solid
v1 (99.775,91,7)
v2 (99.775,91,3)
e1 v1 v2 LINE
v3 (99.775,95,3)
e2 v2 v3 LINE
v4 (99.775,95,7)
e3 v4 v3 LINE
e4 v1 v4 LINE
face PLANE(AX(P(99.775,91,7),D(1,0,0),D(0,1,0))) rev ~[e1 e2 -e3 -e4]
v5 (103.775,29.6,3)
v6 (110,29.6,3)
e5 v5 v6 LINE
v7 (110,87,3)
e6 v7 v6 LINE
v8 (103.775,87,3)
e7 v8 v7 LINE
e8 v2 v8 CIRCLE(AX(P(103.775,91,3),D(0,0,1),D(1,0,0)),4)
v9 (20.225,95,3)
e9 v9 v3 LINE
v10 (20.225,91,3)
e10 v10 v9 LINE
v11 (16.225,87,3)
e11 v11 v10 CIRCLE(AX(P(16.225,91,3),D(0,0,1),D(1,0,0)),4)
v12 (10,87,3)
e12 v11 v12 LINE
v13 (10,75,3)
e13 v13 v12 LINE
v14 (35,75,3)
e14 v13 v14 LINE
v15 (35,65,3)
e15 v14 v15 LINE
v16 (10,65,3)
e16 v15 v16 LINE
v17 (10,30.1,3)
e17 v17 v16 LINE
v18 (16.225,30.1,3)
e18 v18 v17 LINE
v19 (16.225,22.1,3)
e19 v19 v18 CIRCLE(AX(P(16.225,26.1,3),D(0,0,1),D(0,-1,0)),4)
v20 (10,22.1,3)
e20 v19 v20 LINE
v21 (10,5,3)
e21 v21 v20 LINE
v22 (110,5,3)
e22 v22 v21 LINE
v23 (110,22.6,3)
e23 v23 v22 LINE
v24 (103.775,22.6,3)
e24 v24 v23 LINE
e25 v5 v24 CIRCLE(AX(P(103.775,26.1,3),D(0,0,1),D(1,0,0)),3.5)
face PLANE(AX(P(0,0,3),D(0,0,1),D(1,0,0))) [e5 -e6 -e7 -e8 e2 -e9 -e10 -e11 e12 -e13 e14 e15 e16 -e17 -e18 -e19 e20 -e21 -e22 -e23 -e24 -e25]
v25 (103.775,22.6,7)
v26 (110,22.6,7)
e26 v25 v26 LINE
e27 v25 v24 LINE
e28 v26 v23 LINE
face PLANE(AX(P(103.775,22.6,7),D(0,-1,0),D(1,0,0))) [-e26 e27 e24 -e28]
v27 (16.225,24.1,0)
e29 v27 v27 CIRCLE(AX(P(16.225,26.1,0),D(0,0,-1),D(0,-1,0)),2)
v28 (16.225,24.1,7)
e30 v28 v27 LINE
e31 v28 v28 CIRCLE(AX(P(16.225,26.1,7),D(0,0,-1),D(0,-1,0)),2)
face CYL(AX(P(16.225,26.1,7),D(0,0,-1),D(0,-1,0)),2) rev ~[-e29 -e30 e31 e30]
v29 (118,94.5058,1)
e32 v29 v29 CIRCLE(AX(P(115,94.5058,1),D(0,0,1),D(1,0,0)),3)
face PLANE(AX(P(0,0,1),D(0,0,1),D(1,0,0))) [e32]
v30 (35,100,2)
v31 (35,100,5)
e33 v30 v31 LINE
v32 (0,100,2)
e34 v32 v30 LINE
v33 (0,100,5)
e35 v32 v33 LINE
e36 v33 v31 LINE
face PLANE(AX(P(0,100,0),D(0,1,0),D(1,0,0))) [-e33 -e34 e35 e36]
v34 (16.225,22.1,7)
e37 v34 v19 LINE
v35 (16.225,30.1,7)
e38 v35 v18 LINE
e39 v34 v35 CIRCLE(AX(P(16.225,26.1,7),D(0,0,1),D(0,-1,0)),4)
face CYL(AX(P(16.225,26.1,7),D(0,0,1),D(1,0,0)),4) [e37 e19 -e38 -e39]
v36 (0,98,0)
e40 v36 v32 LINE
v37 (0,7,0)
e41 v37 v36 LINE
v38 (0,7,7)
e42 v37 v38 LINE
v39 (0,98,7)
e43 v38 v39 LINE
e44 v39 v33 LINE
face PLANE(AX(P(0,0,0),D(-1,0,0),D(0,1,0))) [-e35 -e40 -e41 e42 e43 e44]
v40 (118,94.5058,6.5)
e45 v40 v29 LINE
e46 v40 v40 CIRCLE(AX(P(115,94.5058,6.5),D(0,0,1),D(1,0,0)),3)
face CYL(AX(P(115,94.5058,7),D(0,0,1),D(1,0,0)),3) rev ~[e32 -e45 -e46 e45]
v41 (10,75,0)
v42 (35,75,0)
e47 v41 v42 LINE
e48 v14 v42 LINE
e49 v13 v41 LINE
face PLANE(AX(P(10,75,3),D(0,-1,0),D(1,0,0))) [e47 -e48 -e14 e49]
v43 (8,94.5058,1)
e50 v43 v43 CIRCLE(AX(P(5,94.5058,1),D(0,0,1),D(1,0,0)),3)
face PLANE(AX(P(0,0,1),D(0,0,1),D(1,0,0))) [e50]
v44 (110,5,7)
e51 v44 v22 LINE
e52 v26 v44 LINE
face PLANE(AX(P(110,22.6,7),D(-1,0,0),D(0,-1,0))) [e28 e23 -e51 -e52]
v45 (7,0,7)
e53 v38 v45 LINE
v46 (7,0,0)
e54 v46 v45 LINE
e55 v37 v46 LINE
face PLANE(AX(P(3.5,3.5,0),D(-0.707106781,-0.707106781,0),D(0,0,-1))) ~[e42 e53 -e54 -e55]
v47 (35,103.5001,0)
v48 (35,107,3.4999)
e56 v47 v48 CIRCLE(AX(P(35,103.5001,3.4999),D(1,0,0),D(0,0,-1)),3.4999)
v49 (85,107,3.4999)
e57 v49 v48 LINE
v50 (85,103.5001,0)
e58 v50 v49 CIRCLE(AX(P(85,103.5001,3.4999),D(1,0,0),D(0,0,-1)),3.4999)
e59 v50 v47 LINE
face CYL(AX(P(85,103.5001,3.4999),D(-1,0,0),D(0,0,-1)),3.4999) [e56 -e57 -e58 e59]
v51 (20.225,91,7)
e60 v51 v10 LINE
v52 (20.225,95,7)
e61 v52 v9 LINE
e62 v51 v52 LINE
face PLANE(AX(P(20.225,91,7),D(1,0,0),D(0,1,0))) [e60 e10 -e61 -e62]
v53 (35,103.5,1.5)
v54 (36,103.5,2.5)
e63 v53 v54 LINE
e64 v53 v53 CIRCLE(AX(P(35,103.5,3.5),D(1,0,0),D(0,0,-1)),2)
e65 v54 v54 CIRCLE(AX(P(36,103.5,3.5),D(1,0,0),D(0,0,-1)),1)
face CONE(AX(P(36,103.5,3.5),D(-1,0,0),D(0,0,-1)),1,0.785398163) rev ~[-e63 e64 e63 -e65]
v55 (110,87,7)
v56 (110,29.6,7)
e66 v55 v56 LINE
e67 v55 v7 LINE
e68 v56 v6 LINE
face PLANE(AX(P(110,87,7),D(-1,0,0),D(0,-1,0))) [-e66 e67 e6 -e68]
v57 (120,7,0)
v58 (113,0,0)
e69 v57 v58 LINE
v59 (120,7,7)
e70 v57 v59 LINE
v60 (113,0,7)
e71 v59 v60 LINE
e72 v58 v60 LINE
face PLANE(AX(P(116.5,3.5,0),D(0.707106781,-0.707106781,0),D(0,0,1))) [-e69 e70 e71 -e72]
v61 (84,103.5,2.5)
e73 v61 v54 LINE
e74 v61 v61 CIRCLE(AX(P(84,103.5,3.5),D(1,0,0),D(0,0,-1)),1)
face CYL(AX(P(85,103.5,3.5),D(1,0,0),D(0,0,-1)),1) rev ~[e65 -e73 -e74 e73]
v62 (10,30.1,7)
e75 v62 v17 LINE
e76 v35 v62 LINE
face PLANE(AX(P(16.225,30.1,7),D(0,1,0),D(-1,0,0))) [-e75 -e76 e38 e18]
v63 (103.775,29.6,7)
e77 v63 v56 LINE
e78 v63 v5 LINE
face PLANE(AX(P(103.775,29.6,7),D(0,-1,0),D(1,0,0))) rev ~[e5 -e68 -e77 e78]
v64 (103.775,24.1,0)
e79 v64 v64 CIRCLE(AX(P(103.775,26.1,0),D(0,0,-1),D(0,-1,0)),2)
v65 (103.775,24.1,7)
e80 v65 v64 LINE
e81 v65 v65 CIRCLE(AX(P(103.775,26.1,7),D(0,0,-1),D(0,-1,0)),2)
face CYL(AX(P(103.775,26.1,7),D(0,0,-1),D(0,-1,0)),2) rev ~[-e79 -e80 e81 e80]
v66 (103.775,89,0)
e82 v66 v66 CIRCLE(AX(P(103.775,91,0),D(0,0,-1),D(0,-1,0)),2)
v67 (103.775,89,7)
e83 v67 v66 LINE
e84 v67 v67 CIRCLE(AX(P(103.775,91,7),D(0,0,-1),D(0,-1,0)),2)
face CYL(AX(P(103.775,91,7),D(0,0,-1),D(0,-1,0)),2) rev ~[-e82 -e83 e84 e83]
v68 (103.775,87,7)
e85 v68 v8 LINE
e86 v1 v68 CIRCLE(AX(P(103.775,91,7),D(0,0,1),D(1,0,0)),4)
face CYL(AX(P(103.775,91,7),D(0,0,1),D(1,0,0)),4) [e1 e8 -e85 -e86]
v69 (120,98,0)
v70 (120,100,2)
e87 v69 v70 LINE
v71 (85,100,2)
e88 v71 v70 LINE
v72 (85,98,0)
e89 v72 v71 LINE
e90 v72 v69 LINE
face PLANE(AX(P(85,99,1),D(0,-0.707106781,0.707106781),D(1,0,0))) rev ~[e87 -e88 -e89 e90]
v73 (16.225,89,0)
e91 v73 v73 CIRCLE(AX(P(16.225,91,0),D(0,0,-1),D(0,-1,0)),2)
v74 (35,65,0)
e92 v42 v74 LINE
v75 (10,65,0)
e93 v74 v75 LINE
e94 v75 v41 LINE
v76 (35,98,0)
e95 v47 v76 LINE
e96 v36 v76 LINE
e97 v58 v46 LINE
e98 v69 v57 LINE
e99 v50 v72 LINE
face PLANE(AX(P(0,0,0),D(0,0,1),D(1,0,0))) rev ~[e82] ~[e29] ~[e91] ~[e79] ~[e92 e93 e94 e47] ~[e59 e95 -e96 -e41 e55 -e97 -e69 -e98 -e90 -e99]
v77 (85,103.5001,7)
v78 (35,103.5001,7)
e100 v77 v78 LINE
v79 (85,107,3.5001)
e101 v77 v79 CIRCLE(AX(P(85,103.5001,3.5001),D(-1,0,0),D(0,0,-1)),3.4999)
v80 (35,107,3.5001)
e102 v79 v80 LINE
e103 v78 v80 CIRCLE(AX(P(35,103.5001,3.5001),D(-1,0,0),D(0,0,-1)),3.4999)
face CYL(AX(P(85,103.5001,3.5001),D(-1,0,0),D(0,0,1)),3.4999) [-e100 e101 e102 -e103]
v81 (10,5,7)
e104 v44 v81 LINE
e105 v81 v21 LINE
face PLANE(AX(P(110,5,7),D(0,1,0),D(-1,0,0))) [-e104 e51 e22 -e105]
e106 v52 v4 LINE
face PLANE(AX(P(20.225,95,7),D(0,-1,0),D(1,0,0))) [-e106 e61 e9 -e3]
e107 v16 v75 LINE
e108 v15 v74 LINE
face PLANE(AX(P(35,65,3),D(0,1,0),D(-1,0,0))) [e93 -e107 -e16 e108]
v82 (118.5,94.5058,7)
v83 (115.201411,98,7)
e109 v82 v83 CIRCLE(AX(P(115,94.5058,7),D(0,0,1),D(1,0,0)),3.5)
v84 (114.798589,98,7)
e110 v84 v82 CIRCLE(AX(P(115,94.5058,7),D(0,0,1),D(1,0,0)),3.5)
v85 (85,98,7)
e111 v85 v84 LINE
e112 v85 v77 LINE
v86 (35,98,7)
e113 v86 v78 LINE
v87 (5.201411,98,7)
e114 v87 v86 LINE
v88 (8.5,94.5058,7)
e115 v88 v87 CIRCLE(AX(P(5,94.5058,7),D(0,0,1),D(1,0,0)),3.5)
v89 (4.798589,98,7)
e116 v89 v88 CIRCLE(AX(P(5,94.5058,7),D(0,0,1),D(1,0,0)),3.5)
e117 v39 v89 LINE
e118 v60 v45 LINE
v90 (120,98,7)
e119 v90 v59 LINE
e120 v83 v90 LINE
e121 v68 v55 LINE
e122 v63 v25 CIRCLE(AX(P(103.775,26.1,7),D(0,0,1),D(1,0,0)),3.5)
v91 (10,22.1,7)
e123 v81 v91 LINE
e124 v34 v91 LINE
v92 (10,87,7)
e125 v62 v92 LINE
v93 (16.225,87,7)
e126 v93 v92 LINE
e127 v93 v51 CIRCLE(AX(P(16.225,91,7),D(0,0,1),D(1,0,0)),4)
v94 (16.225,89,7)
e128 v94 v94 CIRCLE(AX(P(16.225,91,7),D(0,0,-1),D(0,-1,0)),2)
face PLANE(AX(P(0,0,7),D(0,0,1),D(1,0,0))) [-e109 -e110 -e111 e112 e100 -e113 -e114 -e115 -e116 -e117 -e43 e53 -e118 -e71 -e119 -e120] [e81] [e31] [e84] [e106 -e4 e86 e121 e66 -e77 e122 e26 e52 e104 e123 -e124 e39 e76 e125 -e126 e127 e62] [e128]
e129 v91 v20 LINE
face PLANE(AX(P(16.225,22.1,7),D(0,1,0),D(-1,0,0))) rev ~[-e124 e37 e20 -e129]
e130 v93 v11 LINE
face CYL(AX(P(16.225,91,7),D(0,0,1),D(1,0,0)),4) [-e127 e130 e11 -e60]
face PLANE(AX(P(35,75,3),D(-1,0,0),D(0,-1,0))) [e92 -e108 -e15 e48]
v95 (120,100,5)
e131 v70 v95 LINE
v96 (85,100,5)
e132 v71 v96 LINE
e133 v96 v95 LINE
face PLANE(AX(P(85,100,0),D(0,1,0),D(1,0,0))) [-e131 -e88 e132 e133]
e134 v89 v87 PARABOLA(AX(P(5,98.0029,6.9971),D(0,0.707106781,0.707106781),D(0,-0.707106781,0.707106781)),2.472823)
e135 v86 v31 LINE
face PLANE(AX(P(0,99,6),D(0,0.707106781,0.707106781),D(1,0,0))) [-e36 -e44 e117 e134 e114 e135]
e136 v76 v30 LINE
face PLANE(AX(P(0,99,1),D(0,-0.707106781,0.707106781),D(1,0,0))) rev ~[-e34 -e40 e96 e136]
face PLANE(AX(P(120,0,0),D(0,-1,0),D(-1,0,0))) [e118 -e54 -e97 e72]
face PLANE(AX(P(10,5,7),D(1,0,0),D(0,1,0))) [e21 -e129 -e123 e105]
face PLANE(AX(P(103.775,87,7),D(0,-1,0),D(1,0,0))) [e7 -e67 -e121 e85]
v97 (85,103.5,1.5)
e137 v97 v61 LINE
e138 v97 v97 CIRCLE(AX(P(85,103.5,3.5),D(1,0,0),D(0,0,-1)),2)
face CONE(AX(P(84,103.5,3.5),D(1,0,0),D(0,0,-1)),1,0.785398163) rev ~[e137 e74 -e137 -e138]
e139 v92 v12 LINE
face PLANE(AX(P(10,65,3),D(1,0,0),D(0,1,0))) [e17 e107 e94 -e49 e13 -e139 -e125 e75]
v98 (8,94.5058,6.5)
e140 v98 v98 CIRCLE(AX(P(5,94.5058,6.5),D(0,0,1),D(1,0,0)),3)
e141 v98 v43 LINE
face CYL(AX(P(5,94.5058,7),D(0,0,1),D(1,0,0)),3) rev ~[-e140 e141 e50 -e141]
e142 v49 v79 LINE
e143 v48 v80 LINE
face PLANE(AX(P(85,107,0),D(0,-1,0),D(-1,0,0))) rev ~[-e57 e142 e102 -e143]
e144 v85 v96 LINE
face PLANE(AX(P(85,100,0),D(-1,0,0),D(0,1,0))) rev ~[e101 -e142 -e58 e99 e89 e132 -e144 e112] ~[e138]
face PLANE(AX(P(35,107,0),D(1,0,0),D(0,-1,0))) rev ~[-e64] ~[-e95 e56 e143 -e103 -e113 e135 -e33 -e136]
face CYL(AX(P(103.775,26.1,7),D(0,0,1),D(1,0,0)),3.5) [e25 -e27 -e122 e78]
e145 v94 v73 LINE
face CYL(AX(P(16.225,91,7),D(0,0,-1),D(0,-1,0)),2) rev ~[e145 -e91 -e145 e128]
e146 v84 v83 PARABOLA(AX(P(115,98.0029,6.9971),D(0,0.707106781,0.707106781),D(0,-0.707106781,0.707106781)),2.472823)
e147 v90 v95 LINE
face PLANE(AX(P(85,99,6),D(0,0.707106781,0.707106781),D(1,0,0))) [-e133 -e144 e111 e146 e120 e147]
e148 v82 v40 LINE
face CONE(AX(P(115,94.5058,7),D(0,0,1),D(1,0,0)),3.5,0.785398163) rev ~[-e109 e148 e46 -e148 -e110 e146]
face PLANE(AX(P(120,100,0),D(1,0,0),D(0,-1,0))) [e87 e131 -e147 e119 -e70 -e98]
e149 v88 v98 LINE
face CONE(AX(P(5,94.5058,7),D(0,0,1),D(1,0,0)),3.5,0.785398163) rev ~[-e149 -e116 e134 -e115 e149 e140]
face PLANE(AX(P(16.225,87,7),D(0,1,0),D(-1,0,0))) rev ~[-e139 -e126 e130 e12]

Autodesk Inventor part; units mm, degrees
ref_plane "YZ Plane" through (0, 0, 0) normal (1, 0, 0) x (0, 1, 0)
ref_plane "XZ Plane" through (0, 0, 0) normal (0, 1, 0) x (-1, 0, 0)
ref_plane "XY Plane" through (0, 0, 0) normal (0, 0, 1) x (1, 0, 0)
sketch "Sketch1" plane through (0, 0, 0) normal (0, 0, 1) x (1, 0, 0)
  line L0 (0, 100) -> (120, 100)
  line L1 (120, 100) -> (120, 0)
  line L2 (120, 0) -> (0, 0)
  line L3 (0, 0) -> (0, 100)
  line L4 (35, 100) -> (85, 100)
  line L5 (85, 100) -> (85, 107)
  line L6 (85, 107) -> (35, 107)
  line L7 (35, 107) -> (35, 100)
  point P0 (60, 100)
  dimension "d0" = 120
  dimension "d1" = 50
  dimension "d2" = 7
  dimension "d3" = 100
extrude "Extrusion1" add sketch "Sketch1" along normal blind 7
fillet "Fillet1" radius 3.5 2 edges at (60, 107, 7) (60, 107, 0)
sketch "Sketch2" plane through (85, 100, 7) normal (1, 0, 0) x (0, 0, -1)
  arc A0 (7, 3.5) -> (0, 3.5) centre (3.5, 3.5) ccw projected
  line L0 (0, 0) -> (0, 3.5) projected
  line L1 (7, 0) -> (0, 0) projected
  line L2 (7, 0) -> (7, 3.5) projected
  circle A1 centre (3.5, 3.5) radius 1
  point P0 (7, -100)
  dimension "d7" = 2
extrude "Extrusion2" cut sketch "Sketch2" against normal through all contours A1
ref_plane "Work Plane1" through (60, 0, 0) normal (1, 0, 0) x (0, 0, -1)
ref_plane "Work Plane2" through (0, 50, 0) normal (0, 1, 0) x (1, 0, 0)
chamfer "Chamfer1" distance 2 angle 45 4 edges at (17.5, 100, 7) (17.5, 100, 0) (102.5, 100, 0) (102.5, 100, 7)
sketch "Sketch3" plane through (0, 0, 7) normal (0, 0, 1) x (1, 0, 0)
  circle A0 centre (115, 94.5058) radius 3 projected
  circle A1 centre (5, 94.5058) radius 3 projected
  point P0 (0, 0)
extrude "Extrusion3" cut sketch "Sketch3" against normal blind 6
chamfer "Chamfer2" distance 0.5 angle 45 2 edges at (112, 94.5058, 7) (2, 94.5058, 7)
sketch "Sketch4" plane through (0, 0, 7) normal (0, 0, 1) x (1, 0, 0)
  line L0 (10, 95) -> (110, 95)
  line L1 (110, 95) -> (110, 5)
  line L2 (110, 5) -> (10, 5)
  line L3 (10, 5) -> (10, 95)
  line L4 (35, 100) -> (0, 100) projected
  line L5 (0, 98) -> (0, 0) projected
  line L6 (120, 0) -> (120, 98) projected
  line L7 (0, 0) -> (120, 0) projected
  line L8 (16.225, 91) -> (103.775, 91) construction
  line L9 (103.775, 91) -> (103.775, 26.1) construction
  line L10 (103.775, 26.1) -> (16.225, 26.1) construction
  line L11 (16.225, 26.1) -> (16.225, 91) construction
  circle A0 centre (16.225, 91) radius 4
  line L12 (20.225, 91) -> (20.225, 95)
  line L13 (16.225, 87) -> (10, 87)
  circle A1 centre (16.225, 26.1) radius 4
  line L14 (16.225, 30.1) -> (10, 30.1)
  line L15 (16.225, 22.1) -> (10, 22.1)
  circle A2 centre (103.775, 91) radius 4
  circle A3 centre (103.775, 26.1) radius 3.5
  line L16 (103.775, 29.6) -> (110, 29.6)
  line L17 (103.775, 22.6) -> (110, 22.6)
  line L18 (99.775, 91) -> (99.775, 95)
  line L19 (103.775, 87) -> (110, 87)
  point P0 (60, 91)
  point P1 (60, 95)
  dimension "d18" = 5
  dimension "d19" = 10
  dimension "d20" = 10
  dimension "d21" = 5
  dimension "d24" = 87.55
  dimension "d25" = 64.9
  dimension "d26" = 4
  dimension "d27" = 8
  dimension "d28" = 8
  dimension "d29" = 8
  dimension "d30" = 7
extrude "Extrusion4" cut sketch "Sketch4" against normal blind 4 contours L0 L18 A2 L19 L1 L16 A3 L17 L2 L3 L15 A1 L14 L13 A0 L12
sketch "Sketch5" plane through (0, 0, 7) normal (0, 0, 1) x (1, 0, 0)
  line L0 (103.775, 22.6) -> (110, 22.6) projected
  line L1 (110, 22.6) -> (110, 5) projected
  line L2 (110, 5) -> (10, 5) projected
  line L3 (10, 5) -> (10, 22.1) projected
  line L4 (10, 22.1) -> (16.225, 22.1) projected
  arc A0 (16.225, 22.1) -> (16.225, 30.1) centre (16.225, 26.1) ccw projected
  line L5 (16.225, 30.1) -> (10, 30.1) projected
  line L6 (10, 30.1) -> (10, 87) projected
  line L7 (10, 87) -> (16.225, 87) projected
  arc A1 (16.225, 87) -> (20.225, 91) centre (16.225, 91) ccw projected
  line L8 (20.225, 91) -> (20.225, 95) projected
  line L9 (20.225, 95) -> (99.775, 95) projected
  line L10 (99.775, 95) -> (99.775, 91) projected
  arc A2 (99.775, 91) -> (103.775, 87) centre (103.775, 91) ccw projected
  line L11 (103.775, 87) -> (110, 87) projected
  line L12 (110, 87) -> (110, 29.6) projected
  line L13 (110, 29.6) -> (103.775, 29.6) projected
  arc A3 (103.775, 29.6) -> (103.775, 22.6) centre (103.775, 26.1) ccw projected
  arc A4 (4.798, 98) -> (5.202, 98) centre (5, 94.5058) ccw projected
  line L14 (0, 98) -> (4.798, 98) projected
  line L15 (0, 98) -> (0, 0) projected
  line L16 (0, 0) -> (120, 0) projected
  line L17 (120, 0) -> (120, 98) projected
  line L18 (115.202, 98) -> (120, 98) projected
  arc A5 (114.798, 98) -> (115.202, 98) centre (115, 94.5058) ccw projected
  line L19 (85, 98) -> (114.798, 98) projected
  line L20 (85, 98) -> (85, 103.5) projected
  line L21 (35, 103.5) -> (85, 103.5) projected
  line L22 (35, 103.5) -> (35, 98) projected
  line L23 (5.202, 98) -> (35, 98) projected
hole "Hole1" at (16.225, 91, 7) at (16.225, 26.1, 7) at (103.775, 26.1, 7) at (103.775, 91, 7) direction (0, 0, -1) diameter 4 end through all
sketch "Sketch6" plane through (0, 0, 3) normal (0, 0, 1) x (1, 0, 0)
  line L0 (10, 30.1) -> (10, 87) projected
  line L1 (10, 75) -> (35, 75)
  line L2 (35, 75) -> (35, 65)
  line L3 (35, 65) -> (10, 65)
  line L4 (10, 65) -> (10, 75)
  line L5 (20.225, 95) -> (99.775, 95) projected
  point P0 (0, 0)
  point P1 (10, 65)
  dimension "d40" = 20
  dimension "d41" = 10
  dimension "d42" = 25
extrude "Extrusion5" cut sketch "Sketch6" against normal through all
chamfer "Chamfer3" distance 7 angle 45 2 edges at (120, 0, 3.5) (0, 0, 3.5)
chamfer "Chamfer4" distance 1 angle 45 2 edges at (35, 103.5, 4.5) (85, 103.5, 4.5)
properties part number "LCD Mount 2"
